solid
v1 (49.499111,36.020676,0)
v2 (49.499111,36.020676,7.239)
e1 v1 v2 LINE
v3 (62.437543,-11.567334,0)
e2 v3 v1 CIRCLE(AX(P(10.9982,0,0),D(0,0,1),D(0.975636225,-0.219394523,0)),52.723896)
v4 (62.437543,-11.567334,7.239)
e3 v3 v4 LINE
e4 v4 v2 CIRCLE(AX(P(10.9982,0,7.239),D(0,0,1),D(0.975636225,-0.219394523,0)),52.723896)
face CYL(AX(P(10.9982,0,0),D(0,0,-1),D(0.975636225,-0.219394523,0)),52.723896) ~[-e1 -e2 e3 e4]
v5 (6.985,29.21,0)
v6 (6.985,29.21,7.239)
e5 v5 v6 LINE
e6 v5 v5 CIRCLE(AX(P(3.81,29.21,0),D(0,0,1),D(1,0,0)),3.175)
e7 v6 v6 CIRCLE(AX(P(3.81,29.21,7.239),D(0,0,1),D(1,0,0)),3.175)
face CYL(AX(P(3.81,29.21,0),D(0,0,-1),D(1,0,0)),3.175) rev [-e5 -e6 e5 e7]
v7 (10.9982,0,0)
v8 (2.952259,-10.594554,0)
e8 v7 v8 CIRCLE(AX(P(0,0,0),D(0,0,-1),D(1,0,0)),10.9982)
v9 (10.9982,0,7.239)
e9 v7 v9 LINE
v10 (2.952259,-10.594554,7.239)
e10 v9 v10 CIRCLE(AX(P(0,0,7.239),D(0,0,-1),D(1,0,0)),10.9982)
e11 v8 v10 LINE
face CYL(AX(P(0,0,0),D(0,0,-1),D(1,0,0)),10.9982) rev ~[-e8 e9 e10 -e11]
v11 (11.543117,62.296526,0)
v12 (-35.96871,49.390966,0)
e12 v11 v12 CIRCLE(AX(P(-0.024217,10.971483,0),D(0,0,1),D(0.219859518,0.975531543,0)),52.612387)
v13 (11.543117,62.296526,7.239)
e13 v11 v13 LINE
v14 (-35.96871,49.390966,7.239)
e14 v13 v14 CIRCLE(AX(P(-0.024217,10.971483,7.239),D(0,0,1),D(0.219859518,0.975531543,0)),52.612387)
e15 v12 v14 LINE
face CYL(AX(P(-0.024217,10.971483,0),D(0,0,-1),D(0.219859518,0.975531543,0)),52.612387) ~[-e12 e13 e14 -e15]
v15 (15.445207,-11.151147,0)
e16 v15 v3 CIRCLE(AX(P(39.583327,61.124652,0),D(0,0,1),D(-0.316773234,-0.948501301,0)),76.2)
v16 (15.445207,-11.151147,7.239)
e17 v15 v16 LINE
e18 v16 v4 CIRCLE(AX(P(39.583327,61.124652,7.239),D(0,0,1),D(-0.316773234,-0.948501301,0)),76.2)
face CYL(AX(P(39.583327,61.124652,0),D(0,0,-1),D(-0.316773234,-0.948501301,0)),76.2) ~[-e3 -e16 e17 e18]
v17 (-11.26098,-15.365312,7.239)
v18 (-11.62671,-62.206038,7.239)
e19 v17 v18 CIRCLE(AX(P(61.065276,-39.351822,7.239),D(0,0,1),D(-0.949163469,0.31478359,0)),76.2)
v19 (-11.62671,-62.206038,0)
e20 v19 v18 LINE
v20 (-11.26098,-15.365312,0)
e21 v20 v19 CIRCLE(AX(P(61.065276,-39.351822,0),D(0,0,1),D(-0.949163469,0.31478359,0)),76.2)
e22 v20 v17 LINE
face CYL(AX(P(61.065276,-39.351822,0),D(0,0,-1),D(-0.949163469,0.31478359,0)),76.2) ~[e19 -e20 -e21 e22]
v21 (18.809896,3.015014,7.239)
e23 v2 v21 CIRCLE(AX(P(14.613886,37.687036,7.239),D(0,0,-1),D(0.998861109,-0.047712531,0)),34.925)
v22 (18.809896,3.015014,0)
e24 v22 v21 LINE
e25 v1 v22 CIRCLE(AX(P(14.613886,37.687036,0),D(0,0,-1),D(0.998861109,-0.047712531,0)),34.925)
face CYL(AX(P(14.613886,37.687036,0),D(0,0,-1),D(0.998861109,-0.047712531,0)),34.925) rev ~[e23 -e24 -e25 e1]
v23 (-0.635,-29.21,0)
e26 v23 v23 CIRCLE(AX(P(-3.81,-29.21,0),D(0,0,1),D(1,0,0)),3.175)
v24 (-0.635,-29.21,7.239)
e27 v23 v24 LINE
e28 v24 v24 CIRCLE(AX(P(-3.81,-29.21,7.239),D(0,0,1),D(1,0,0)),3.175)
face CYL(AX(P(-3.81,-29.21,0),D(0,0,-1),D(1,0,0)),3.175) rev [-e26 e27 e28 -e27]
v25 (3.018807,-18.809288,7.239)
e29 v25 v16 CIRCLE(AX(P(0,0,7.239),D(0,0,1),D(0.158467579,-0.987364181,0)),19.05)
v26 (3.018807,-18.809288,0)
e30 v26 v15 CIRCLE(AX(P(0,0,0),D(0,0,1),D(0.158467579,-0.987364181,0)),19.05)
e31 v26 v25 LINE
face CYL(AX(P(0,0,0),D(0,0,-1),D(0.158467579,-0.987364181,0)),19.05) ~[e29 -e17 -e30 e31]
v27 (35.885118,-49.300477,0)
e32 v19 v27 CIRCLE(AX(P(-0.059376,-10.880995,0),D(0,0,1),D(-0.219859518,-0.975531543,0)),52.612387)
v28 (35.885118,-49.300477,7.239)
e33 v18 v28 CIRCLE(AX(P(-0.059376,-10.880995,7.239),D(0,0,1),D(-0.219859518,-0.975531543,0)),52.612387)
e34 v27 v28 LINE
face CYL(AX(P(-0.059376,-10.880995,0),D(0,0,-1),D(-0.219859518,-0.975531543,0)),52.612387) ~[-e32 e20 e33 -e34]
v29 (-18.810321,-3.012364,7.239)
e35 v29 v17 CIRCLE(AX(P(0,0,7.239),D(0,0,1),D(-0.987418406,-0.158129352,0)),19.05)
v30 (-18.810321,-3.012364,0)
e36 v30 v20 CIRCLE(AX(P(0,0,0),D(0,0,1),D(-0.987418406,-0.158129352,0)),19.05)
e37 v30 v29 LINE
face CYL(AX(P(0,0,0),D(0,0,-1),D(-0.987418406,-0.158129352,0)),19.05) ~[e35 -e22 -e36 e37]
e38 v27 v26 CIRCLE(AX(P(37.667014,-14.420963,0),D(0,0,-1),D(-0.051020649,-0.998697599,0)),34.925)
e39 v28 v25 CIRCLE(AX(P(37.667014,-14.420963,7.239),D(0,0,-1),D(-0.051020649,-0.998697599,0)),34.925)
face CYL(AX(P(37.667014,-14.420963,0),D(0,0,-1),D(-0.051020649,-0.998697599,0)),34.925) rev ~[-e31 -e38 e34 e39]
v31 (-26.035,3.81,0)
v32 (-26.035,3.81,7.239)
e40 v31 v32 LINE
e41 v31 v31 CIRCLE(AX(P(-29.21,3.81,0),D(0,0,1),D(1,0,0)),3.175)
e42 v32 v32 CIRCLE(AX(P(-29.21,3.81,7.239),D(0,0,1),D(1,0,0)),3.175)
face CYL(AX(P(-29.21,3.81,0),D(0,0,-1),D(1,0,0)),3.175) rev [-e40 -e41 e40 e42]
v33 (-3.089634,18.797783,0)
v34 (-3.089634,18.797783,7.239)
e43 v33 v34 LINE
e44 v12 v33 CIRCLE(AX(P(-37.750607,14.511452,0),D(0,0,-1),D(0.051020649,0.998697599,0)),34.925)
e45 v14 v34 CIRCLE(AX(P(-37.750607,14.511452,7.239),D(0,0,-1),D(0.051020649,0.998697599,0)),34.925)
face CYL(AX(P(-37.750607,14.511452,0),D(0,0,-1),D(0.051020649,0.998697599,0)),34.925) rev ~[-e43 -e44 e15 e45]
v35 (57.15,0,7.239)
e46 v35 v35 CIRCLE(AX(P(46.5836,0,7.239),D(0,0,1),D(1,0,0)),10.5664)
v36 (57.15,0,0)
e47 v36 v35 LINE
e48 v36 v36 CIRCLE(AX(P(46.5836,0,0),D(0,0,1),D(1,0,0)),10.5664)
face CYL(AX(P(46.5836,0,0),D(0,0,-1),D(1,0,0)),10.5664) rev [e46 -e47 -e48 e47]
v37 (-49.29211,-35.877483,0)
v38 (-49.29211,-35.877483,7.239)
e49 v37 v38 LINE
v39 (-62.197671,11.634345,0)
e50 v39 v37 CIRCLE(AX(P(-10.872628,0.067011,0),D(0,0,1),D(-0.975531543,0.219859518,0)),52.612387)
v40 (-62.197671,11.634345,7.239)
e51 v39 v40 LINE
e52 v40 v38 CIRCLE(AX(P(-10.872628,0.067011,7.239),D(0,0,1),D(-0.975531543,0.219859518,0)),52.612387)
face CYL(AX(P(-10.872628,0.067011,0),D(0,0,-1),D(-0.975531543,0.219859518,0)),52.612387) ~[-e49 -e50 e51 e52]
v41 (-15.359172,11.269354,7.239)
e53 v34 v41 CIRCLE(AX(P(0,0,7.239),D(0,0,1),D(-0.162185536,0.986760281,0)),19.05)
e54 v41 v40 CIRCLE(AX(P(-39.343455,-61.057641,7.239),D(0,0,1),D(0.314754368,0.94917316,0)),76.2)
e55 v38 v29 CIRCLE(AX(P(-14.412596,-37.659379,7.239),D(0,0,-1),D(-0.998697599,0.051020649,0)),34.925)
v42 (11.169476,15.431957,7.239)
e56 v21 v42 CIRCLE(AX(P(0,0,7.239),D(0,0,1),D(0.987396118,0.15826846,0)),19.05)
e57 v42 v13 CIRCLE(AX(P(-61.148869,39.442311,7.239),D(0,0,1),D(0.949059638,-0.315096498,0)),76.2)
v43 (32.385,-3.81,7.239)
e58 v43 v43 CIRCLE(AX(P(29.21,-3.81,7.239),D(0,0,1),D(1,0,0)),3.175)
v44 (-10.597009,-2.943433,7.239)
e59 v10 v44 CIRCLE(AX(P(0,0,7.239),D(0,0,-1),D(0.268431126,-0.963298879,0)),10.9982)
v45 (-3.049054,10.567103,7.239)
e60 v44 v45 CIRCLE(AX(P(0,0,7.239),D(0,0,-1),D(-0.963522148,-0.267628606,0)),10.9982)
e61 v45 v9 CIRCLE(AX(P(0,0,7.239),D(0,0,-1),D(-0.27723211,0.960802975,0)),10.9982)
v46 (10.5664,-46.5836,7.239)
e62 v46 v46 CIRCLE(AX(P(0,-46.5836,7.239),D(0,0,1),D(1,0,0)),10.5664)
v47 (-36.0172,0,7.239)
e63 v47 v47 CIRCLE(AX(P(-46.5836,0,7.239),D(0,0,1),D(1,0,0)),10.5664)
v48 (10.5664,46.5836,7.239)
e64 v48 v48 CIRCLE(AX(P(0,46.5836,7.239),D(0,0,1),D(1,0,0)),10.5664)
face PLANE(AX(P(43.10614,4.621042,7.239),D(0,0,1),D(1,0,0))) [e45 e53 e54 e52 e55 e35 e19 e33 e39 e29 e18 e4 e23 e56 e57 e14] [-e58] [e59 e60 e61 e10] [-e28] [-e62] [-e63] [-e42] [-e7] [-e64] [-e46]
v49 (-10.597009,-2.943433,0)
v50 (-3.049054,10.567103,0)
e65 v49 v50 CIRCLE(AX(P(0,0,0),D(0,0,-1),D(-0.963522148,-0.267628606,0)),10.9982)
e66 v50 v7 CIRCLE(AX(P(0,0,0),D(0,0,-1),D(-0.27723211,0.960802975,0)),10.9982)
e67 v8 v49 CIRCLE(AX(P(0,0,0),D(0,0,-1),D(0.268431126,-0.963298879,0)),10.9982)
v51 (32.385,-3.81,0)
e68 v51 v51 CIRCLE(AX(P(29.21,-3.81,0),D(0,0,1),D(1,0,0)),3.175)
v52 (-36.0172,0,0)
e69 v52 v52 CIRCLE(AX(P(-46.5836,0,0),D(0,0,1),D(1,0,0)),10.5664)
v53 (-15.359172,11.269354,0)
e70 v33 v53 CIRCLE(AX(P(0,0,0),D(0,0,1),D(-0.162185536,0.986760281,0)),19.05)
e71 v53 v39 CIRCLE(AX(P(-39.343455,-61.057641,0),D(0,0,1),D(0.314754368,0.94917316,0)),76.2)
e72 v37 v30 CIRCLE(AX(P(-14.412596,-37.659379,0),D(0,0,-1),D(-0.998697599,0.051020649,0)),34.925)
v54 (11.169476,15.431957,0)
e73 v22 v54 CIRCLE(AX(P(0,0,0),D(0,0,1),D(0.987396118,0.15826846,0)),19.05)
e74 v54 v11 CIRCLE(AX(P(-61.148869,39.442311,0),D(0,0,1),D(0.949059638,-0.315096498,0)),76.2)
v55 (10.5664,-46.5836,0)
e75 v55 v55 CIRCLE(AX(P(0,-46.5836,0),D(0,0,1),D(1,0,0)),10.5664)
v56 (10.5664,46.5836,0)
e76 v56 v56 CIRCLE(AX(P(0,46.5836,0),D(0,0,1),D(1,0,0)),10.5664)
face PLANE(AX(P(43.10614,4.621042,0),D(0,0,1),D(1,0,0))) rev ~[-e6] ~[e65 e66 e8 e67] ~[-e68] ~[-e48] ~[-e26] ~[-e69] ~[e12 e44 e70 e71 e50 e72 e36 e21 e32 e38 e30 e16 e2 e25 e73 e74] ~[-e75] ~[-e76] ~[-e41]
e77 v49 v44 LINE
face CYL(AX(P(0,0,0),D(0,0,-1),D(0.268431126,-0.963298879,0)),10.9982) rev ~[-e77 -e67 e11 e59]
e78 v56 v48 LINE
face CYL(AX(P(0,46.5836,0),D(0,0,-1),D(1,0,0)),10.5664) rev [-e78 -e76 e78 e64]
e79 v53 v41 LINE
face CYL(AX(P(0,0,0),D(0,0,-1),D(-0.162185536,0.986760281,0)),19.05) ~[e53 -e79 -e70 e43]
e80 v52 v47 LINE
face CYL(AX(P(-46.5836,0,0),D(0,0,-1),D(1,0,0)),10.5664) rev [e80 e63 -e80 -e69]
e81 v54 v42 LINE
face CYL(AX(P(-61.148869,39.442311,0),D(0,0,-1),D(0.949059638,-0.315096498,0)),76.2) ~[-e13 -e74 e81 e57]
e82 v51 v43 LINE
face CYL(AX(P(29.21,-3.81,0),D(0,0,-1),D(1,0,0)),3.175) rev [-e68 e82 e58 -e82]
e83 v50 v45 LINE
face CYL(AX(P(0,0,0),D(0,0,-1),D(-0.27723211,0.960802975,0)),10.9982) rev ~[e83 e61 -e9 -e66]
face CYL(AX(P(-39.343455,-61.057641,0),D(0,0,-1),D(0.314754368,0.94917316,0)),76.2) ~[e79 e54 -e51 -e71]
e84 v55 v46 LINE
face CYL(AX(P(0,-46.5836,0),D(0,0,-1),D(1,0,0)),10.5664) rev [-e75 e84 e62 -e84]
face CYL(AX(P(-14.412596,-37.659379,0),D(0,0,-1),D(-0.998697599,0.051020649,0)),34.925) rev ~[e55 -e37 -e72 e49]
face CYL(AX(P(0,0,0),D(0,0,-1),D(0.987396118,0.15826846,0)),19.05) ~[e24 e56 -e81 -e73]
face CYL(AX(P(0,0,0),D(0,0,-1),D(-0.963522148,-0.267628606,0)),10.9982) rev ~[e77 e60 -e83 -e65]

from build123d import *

# Parameters (mm, degrees)
F0_R     = 3.175
F0_R_2   = 10.5664
F1_DEPTH = 7.239


# Not quite as in the source:
# - a feature names something its author has since deleted; it is built from what else it names


with BuildPart() as f1:
    # F0 (on Top) → F1 (new body)
    with BuildSketch(Plane.XY):
        with BuildLine():
            ThreePointArc((49.499110543, 36.0206762632), (40.1908123412, 13.9051845012), (18.8098960555, 3.0150141596))
            ThreePointArc((18.8098960555, 3.0150141596), (18.9898791446, 1.5122797598), (19.05, 0))
            ThreePointArc((19.05, 0), (18.1264129292, -5.8596633283), (15.4452068954, -11.1511472037))
            ThreePointArc((15.4452068954, -11.1511472037), (38.9084897998, -15.0723597821), (62.437543059, -11.5673340383))
            ThreePointArc((62.437543059, -11.5673340383), (61.8751789356, 13.8326514264), (49.499110543, 36.0206762632))
        make_face()
        with Locations((29.21, -3.81)):
            Circle(F0_R, mode=Mode.SUBTRACT)
        with Locations((46.5836, 0)):
            Circle(F0_R_2, mode=Mode.SUBTRACT)
        with BuildLine():
            ThreePointArc((19.05, 0), (18.9898791446, 1.5122797598), (18.8098960555, 3.0150141596))
            ThreePointArc((18.8098960555, 3.0150141596), (16.2245432897, 9.9833208424), (11.1694758624, 15.4319573923))
            ThreePointArc((11.1694758624, 15.4319573923), (4.3764318058, 18.5404785442), (-3.0896344638, 18.7977833502))
            ThreePointArc((-3.0896344638, 18.7977833502), (-9.9628775585, 16.2371047528), (-15.3591721014, 11.2693536797))
            ThreePointArc((-15.3591721014, 11.2693536797), (-18.5170306594, 4.4746033968), (-18.8103206304, -3.0123641517))
            ThreePointArc((-18.8103206304, -3.0123641517), (-16.2548336089, -9.9339259281), (-11.2609801699, -15.3653124151))
            ThreePointArc((-11.2609801699, -15.3653124151), (-4.4663849388, -18.5190147032), (3.0188073829, -18.8092876522))
            ThreePointArc((3.0188073829, -18.8092876522), (9.994585264, -16.2176066483), (15.4452068954, -11.1511472037))
            ThreePointArc((15.4452068954, -11.1511472037), (18.1264129292, -5.8596633283), (19.05, 0))
        make_face()
        with BuildLine():
            ThreePointArc((-3.0490541894, 10.5671032828), (6.6115919208, 8.7890417858), (10.9982, 0))
            ThreePointArc((10.9982, 0), (8.7587082508, -6.6517240635), (2.9522592067, -10.5945537337))
            ThreePointArc((2.9522592067, -10.5945537337), (-5.4079074823, -9.5767917333), (-10.597009287, -2.9434329297))
            ThreePointArc((-10.597009287, -2.9434329297), (-9.601427461, 5.3640464159), (-3.0490541894, 10.5671032828))
        make_face(mode=Mode.SUBTRACT)
        with BuildLine():
            ThreePointArc((-3.0896344638, 18.7977833502), (4.3764318058, 18.5404785442), (11.1694758624, 15.4319573923))
            ThreePointArc((11.1694758624, 15.4319573923), (15.0487096917, 38.8348029597), (11.5431173905, 62.2965262207))
            ThreePointArc((11.5431173905, 62.2965262207), (-13.8155129183, 61.7441471546), (-35.9687104078, 49.3909655905))
            ThreePointArc((-35.9687104078, 49.3909655905), (-13.9597183633, 40.0799728948), (-3.0896344638, 18.7977833502))
        make_face()
        with Locations((0, 46.5836)):
            Circle(F0_R_2, mode=Mode.SUBTRACT)
        with Locations((3.81, 29.21)):
            Circle(F0_R, mode=Mode.SUBTRACT)
        with BuildLine():
            ThreePointArc((35.8851180212, -49.3004770417), (13.913777395, -40.0244664241), (3.0188073829, -18.8092876522))
            ThreePointArc((3.0188073829, -18.8092876522), (-4.4663849388, -18.5190147032), (-11.2609801699, -15.3653124151))
            ThreePointArc((-11.2609801699, -15.3653124151), (-15.1324011861, -38.7568750152), (-11.6267097771, -62.2060376719))
            ThreePointArc((-11.6267097771, -62.2060376719), (13.7319205316, -61.6536586058), (35.8851180212, -49.3004770417))
        make_face()
        with Locations((0, -46.5836)):
            Circle(F0_R_2, mode=Mode.SUBTRACT)
        with Locations((-3.81, -29.21)):
            Circle(F0_R, mode=Mode.SUBTRACT)
        with BuildLine():
            ThreePointArc((-18.8103206304, -3.0123641517), (-18.5170306594, 4.4746033968), (-15.3591721014, 11.2693536797))
            ThreePointArc((-15.3591721014, 11.2693536797), (-38.7496809324, 15.1400454081), (-62.1976706421, 11.6343448498))
            ThreePointArc((-62.1976706421, 11.6343448498), (-61.6452915761, -13.7242854589), (-49.292110012, -35.8774829485))
            ThreePointArc((-49.292110012, -35.8774829485), (-40.0193213234, -13.909615697), (-18.8103206304, -3.0123641517))
        make_face()
        with Locations((-46.5836, 0)):
            Circle(F0_R_2, mode=Mode.SUBTRACT)
        with Locations((-29.21, 3.81)):
            Circle(F0_R, mode=Mode.SUBTRACT)
    extrude(amount=F1_DEPTH)


solid = f1.part
